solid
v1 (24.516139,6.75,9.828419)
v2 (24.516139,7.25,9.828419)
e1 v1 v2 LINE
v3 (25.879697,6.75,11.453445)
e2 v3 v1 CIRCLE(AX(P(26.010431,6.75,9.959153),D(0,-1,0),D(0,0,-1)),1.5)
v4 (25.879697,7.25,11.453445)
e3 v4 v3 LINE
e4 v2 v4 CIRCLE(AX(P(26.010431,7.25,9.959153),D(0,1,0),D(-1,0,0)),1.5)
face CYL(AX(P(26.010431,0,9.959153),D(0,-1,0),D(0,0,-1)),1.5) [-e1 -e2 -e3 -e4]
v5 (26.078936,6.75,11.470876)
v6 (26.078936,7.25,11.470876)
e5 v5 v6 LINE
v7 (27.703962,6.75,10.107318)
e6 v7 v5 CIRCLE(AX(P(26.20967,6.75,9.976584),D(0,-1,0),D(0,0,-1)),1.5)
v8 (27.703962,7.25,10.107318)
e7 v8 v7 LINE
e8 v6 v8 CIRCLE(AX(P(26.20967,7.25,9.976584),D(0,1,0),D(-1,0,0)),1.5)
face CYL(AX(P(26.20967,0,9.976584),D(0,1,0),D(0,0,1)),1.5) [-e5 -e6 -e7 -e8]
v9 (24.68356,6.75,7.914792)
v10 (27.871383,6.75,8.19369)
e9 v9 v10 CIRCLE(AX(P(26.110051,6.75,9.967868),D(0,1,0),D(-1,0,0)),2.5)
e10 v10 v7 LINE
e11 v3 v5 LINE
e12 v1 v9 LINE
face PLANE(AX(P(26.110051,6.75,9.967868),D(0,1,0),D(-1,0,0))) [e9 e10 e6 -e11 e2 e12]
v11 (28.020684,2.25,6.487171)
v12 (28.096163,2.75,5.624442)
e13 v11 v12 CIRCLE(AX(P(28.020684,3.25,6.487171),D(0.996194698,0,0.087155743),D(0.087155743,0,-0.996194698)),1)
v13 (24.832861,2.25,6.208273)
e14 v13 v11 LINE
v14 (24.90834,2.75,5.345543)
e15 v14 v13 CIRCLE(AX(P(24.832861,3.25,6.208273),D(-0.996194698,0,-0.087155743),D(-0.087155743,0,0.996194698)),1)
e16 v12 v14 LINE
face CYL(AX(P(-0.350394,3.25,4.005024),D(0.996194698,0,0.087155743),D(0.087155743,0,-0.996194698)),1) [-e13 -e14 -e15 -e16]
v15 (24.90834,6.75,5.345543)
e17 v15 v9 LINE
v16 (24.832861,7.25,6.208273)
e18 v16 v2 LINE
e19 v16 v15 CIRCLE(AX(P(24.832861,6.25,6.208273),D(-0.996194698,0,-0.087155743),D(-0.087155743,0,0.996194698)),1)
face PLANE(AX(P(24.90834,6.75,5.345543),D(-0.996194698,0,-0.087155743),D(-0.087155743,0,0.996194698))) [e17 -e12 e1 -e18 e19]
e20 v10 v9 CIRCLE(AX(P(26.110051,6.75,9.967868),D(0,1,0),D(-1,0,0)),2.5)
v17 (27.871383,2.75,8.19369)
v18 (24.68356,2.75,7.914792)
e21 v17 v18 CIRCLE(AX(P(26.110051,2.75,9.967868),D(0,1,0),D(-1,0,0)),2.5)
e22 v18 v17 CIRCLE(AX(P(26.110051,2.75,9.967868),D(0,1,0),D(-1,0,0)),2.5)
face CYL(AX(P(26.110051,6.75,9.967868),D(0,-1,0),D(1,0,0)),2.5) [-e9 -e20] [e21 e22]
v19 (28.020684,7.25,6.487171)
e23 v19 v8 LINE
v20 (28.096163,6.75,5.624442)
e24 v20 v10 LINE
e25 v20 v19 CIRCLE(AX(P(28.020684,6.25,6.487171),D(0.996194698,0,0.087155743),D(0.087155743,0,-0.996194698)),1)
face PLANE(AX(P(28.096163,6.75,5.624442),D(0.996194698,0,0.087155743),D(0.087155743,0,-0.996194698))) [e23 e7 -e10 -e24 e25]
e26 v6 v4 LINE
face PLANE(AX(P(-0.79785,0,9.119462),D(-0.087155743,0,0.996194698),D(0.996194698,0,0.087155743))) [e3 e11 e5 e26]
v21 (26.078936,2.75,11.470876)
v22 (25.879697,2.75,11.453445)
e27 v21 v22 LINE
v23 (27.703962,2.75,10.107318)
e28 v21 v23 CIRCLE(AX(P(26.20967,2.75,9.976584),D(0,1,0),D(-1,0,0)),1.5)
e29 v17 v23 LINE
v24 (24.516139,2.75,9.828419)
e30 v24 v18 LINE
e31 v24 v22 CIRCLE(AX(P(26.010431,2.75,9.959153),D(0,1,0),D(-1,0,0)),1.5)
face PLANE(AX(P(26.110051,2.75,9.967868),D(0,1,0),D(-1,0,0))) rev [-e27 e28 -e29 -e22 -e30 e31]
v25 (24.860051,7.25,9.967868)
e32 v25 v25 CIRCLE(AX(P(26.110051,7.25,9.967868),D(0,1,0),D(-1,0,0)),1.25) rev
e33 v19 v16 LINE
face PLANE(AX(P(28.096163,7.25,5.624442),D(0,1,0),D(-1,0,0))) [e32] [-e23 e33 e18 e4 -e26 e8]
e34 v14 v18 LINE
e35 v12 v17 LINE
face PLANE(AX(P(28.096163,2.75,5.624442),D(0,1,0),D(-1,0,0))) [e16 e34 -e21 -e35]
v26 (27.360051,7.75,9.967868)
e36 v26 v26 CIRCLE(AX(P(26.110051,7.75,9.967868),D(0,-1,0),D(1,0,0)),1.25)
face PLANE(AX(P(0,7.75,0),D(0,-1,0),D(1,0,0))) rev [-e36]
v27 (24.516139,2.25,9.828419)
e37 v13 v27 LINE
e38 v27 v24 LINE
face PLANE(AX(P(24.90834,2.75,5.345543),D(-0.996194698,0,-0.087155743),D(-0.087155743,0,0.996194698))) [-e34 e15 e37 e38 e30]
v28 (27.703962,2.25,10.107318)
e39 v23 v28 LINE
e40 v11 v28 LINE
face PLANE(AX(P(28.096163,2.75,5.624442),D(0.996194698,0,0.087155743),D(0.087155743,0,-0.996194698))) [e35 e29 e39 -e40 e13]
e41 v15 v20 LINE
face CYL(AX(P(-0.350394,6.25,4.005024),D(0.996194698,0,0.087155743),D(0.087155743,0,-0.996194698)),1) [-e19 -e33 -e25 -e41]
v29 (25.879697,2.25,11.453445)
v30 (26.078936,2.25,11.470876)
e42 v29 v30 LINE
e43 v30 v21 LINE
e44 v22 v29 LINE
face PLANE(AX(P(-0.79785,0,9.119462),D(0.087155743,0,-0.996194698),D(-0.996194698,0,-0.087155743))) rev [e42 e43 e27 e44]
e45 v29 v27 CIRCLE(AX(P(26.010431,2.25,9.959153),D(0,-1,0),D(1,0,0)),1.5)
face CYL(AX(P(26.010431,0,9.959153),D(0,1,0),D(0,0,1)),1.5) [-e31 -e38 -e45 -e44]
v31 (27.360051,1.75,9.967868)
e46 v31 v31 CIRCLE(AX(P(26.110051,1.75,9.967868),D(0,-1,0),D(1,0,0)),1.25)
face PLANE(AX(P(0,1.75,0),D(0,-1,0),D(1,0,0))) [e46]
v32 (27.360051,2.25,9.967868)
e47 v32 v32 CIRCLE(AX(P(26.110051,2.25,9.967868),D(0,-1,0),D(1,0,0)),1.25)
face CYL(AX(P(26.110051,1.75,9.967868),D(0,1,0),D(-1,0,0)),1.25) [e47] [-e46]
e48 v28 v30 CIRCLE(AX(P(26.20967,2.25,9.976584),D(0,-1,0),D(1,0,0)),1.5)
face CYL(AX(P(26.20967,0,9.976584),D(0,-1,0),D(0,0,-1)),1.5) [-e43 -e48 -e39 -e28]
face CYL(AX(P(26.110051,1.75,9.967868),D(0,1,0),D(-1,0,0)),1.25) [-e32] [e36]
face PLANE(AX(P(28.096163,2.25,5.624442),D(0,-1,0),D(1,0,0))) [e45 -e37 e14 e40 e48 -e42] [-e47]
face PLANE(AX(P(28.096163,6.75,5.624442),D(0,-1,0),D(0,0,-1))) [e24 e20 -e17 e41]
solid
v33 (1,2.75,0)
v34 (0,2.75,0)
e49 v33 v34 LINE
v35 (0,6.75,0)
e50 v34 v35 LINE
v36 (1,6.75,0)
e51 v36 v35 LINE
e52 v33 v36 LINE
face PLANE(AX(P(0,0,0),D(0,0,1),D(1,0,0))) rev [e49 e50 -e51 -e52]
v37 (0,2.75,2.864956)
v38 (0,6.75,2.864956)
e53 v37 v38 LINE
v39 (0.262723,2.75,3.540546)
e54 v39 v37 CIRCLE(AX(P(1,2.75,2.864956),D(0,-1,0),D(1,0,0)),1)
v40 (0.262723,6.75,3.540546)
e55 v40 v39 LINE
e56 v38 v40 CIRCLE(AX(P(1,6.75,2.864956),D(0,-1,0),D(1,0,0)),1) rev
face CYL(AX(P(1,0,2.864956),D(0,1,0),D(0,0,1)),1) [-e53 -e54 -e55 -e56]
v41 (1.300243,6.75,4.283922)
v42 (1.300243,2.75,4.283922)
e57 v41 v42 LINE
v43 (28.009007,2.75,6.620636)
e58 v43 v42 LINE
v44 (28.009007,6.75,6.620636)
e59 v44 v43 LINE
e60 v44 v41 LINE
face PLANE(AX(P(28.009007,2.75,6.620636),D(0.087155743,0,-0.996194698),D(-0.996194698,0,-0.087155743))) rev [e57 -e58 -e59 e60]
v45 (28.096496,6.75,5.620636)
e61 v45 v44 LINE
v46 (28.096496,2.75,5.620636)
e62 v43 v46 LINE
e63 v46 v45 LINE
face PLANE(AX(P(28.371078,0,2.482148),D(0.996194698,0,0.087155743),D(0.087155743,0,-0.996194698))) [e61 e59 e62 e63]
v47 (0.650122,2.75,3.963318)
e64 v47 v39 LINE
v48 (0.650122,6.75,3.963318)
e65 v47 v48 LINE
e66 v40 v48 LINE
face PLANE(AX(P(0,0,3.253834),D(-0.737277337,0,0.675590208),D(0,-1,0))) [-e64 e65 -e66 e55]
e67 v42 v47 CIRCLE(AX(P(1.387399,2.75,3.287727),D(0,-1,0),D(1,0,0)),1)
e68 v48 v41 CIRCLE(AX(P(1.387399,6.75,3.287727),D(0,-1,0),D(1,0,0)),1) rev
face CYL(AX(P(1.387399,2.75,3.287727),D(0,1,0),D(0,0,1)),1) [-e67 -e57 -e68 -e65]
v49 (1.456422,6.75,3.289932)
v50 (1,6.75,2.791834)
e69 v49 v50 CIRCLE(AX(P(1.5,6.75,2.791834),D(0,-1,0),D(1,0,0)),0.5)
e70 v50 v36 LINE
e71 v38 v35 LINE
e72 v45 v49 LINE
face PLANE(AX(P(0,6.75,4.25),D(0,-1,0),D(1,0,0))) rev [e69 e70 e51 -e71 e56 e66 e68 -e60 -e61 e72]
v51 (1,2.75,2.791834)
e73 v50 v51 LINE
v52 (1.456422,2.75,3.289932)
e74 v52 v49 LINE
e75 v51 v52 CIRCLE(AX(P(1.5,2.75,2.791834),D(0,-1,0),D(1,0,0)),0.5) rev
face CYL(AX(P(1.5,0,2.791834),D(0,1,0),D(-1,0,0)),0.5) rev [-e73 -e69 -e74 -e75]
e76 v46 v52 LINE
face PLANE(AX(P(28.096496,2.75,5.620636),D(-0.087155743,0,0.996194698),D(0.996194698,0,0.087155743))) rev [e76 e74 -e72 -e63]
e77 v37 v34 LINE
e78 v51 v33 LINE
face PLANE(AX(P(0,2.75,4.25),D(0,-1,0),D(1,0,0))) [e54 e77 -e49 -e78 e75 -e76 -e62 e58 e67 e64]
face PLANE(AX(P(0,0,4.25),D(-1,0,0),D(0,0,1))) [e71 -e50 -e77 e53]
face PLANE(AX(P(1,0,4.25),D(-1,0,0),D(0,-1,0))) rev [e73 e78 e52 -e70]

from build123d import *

# Parameters (mm, degrees)
SKETCH1_W                  = 1
SKETCH1_H                  = 4
BOSS_EXTRUDE1_DEPTH        = 4.25
CHAMFER1_SIZE              = 1
CHAMFER1_SIZE2             = 0.087488664
SKETCH2_W                  = 1.003819838
SKETCH2_H                  = 4
BOSS_EXTRUDE2_DEPTH        = 27.2
CHAMFER2_START             = -4
CHAMFER2_OUTLINE_W         = 4
CHAMFER2_OUTLINE_H         = 7
CHAMFER2_DEPTH             = 1.801741323
FILLET2_R                  = 0.5
FILLET3_R                  = 1
BOSS_EXTRUDE3_DEPTH        = 5
BOSS_EXTRUDE3_DEPTH_BACK   = 1
SKETCH3_W                  = 3.2
SKETCH3_H                  = 0.5
BOSS_EXTRUDE3_2_DEPTH      = 5
BOSS_EXTRUDE3_2_DEPTH_BACK = 1
FILLET5_R                  = 1
FILLET6_R                  = 1
FILLET9_R                  = 1.5
FILLET10_R                 = 1.5
BOSS_EXTRUDE4_DEPTH        = 0.5
BOSS_EXTRUDE4_DEPTH_BACK   = 5.5
SKETCH5_R                  = 1.25
SKETCH6_R                  = 2.5
BOSS_EXTRUDE5_DEPTH        = 4


with BuildPart() as part:
    # Sketch1 → Boss-Extrude1 (new body)
    with BuildSketch(Plane.XY):
        with Locations((0.5, 4.75)):
            Rectangle(SKETCH1_W, SKETCH1_H)
    extrude(amount=BOSS_EXTRUDE1_DEPTH)

    # Chamfer1
    chamfer1_edges = [part.edges().sort_by_distance(p)[0] for p in [
        (1, 4.75, 4.25),
    ]]
    chamfer1_side = [part.faces().sort_by_distance(p)[0] for p in [
        (1, 4.75, 2.125),
    ]]
    chamfer(chamfer1_edges, length=CHAMFER1_SIZE, length2=CHAMFER1_SIZE2, reference=chamfer1_side[0])

    # Sketch2 → Boss-Extrude2 (add)
    with BuildSketch(Plane(origin=(1.274582165, 0, 0.11151149), x_dir=(0.08715574274765592, 0, -0.9961946980917458), z_dir=(0.9961946980917459, 0, 0.08715574274765593))):
        with Locations((-3.652386945, 4.75)):
            Rectangle(SKETCH2_W, SKETCH2_H)
    extrude(amount=BOSS_EXTRUDE2_DEPTH)

    # Chamfer2: read off the stored shape, not the designer's step
    # Chamfer2 outline → Chamfer2 (cut)
    with BuildSketch(Plane(origin=(0, 0, 0), x_dir=(0.6755902076156571, 0, 0.737277336810127), z_dir=(0.737277336810127, 0, -0.675590207615657)).offset(CHAMFER2_START)):
        with Locations((3, -4.5)):
            Rectangle(CHAMFER2_OUTLINE_W, CHAMFER2_OUTLINE_H)
    extrude(amount=CHAMFER2_DEPTH, mode=Mode.SUBTRACT)

    # Fillet2
    fillet2_edges = [part.edges().sort_by_distance(p)[0] for p in [
        (1, 4.75, 3.25),
    ]]
    fillet(fillet2_edges, radius=FILLET2_R)

    # Fillet3
    fillet3_edges = [part.edges().sort_by_distance(p)[0] for p in [
        (0, 4.75, 3.253834428),
        (0.912844258, 4.75, 4.250029127),
    ]]
    fillet(fillet3_edges, radius=FILLET3_R)


with BuildPart() as body_2:
    # Sketch3 → Boss-Extrude3 (new, two sides: drawn at the far end of the back side and taken through both)
    with BuildSketch(Plane(origin=(-0.362070829, 0, 4.13848851), x_dir=(0.9961946980917458, 0, 0.08715574274765595), z_dir=(-0.08715574274765596, 0, 0.9961946980917459)).offset(-BOSS_EXTRUDE3_DEPTH_BACK)):
        with Locations((26.879450862, 7)):
            Rectangle(SKETCH3_W, SKETCH3_H)
    extrude(amount=BOSS_EXTRUDE3_DEPTH + BOSS_EXTRUDE3_DEPTH_BACK)

    # Fillet5
    # the kernel refuses this fillet: 1 mm, written as the material it takes off along each edge
    with BuildSketch(Plane(origin=(22.751515044, 7.25, 5.15684541), x_dir=(-0.08715574274765596, 0, 0.9961946980917458), z_dir=(0.9961946980917459, 0, 0.08715574274765596))) as fillet5_piece_1:
        with BuildLine():
            CenterArc((0.866025404, 1), FILLET5_R, 210, 60)
            Line((0, 0.5), (-0.017320508, 0.49))
            ThreePointArc((-0.017320508, 0.49), (-0.02, 0.25), (-0.02, 0))
            Line((-0.02, 0), (0, -0.02))
            Line((0, -0.02), (0.866025404, -0.02))
            Line((0.866025404, -0.02), (0.866025404, 0))
        make_face()
    extrude(amount=7.530127019, mode=Mode.SUBTRACT)

    # Fillet10
    fillet10_edges = [body_2.edges().sort_by_distance(p)[0] for p in [
        (27.573228411, 7, 11.601609693),
        (24.385405377, 7, 11.322711316),
    ]]
    fillet(fillet10_edges, radius=FILLET10_R)



with BuildPart() as body_3:
    # Sketch3 → Boss-Extrude3 2 (new, two sides: drawn at the far end of the back side and taken through both)
    with BuildSketch(Plane(origin=(-0.362070829, 0, 4.13848851), x_dir=(0.9961946980917458, 0, 0.08715574274765595), z_dir=(-0.08715574274765596, 0, 0.9961946980917459)).offset(-BOSS_EXTRUDE3_2_DEPTH_BACK)):
        with Locations((26.879450862, 2.5)):
            Rectangle(SKETCH3_W, SKETCH3_H)
    extrude(amount=BOSS_EXTRUDE3_2_DEPTH + BOSS_EXTRUDE3_2_DEPTH_BACK)

    # Fillet6
    # the kernel refuses this fillet: 1 mm, written as the material it takes off along each edge
    with BuildSketch(Plane(origin=(22.751515044, 2.25, 5.15684541), x_dir=(0, 1, 0), z_dir=(0.9961946980917459, 0, 0.08715574274765596))) as fillet6_piece_1:
        with BuildLine():
            CenterArc((1, 0.866025404), FILLET6_R, 180, 60)
            Line((0, 0.866025404), (-0.02, 0.866025404))
            Line((-0.02, 0.866025404), (-0.02, 0))
            Line((-0.02, 0), (0, -0.02))
            ThreePointArc((0, -0.02), (0.25, -0.02), (0.49, -0.017320508))
            Line((0.49, -0.017320508), (0.5, 0))
        make_face()
    extrude(amount=7.530127019, mode=Mode.SUBTRACT)

    # Fillet9
    fillet9_edges = [body_3.edges().sort_by_distance(p)[0] for p in [
        (27.573228411, 2.5, 11.601609693),
        (24.385405377, 2.5, 11.322711316),
    ]]
    fillet(fillet9_edges, radius=FILLET9_R)


with BuildPart() as body_2_1:
    add(body_2.part)

    add(body_3.part)  # Boss-Extrude4 merges body 3
    # Sketch5 → Boss-Extrude4 (add, two sides: drawn at the far end of the back side and taken through both)
    with BuildSketch(Plane.XZ.offset(-2.25).offset(-BOSS_EXTRUDE4_DEPTH_BACK)):
        with Locations(Location((26.110050508, 9.967868458, 0), (0, 0, 180))):
            Circle(SKETCH5_R)
    extrude(amount=BOSS_EXTRUDE4_DEPTH + BOSS_EXTRUDE4_DEPTH_BACK)

    # Sketch6 → Boss-Extrude5 (add)
    with BuildSketch(Plane(origin=(0, 2.75, 0), x_dir=(1, 0, 0), z_dir=(0, 1, 0))):
        with Locations(Location((26.110050508, -9.967868458, 0), (0, 0, 45.2081805))):
            Circle(SKETCH6_R)
    extrude(amount=BOSS_EXTRUDE5_DEPTH)


solid = Compound([part.part, body_2_1.part])
